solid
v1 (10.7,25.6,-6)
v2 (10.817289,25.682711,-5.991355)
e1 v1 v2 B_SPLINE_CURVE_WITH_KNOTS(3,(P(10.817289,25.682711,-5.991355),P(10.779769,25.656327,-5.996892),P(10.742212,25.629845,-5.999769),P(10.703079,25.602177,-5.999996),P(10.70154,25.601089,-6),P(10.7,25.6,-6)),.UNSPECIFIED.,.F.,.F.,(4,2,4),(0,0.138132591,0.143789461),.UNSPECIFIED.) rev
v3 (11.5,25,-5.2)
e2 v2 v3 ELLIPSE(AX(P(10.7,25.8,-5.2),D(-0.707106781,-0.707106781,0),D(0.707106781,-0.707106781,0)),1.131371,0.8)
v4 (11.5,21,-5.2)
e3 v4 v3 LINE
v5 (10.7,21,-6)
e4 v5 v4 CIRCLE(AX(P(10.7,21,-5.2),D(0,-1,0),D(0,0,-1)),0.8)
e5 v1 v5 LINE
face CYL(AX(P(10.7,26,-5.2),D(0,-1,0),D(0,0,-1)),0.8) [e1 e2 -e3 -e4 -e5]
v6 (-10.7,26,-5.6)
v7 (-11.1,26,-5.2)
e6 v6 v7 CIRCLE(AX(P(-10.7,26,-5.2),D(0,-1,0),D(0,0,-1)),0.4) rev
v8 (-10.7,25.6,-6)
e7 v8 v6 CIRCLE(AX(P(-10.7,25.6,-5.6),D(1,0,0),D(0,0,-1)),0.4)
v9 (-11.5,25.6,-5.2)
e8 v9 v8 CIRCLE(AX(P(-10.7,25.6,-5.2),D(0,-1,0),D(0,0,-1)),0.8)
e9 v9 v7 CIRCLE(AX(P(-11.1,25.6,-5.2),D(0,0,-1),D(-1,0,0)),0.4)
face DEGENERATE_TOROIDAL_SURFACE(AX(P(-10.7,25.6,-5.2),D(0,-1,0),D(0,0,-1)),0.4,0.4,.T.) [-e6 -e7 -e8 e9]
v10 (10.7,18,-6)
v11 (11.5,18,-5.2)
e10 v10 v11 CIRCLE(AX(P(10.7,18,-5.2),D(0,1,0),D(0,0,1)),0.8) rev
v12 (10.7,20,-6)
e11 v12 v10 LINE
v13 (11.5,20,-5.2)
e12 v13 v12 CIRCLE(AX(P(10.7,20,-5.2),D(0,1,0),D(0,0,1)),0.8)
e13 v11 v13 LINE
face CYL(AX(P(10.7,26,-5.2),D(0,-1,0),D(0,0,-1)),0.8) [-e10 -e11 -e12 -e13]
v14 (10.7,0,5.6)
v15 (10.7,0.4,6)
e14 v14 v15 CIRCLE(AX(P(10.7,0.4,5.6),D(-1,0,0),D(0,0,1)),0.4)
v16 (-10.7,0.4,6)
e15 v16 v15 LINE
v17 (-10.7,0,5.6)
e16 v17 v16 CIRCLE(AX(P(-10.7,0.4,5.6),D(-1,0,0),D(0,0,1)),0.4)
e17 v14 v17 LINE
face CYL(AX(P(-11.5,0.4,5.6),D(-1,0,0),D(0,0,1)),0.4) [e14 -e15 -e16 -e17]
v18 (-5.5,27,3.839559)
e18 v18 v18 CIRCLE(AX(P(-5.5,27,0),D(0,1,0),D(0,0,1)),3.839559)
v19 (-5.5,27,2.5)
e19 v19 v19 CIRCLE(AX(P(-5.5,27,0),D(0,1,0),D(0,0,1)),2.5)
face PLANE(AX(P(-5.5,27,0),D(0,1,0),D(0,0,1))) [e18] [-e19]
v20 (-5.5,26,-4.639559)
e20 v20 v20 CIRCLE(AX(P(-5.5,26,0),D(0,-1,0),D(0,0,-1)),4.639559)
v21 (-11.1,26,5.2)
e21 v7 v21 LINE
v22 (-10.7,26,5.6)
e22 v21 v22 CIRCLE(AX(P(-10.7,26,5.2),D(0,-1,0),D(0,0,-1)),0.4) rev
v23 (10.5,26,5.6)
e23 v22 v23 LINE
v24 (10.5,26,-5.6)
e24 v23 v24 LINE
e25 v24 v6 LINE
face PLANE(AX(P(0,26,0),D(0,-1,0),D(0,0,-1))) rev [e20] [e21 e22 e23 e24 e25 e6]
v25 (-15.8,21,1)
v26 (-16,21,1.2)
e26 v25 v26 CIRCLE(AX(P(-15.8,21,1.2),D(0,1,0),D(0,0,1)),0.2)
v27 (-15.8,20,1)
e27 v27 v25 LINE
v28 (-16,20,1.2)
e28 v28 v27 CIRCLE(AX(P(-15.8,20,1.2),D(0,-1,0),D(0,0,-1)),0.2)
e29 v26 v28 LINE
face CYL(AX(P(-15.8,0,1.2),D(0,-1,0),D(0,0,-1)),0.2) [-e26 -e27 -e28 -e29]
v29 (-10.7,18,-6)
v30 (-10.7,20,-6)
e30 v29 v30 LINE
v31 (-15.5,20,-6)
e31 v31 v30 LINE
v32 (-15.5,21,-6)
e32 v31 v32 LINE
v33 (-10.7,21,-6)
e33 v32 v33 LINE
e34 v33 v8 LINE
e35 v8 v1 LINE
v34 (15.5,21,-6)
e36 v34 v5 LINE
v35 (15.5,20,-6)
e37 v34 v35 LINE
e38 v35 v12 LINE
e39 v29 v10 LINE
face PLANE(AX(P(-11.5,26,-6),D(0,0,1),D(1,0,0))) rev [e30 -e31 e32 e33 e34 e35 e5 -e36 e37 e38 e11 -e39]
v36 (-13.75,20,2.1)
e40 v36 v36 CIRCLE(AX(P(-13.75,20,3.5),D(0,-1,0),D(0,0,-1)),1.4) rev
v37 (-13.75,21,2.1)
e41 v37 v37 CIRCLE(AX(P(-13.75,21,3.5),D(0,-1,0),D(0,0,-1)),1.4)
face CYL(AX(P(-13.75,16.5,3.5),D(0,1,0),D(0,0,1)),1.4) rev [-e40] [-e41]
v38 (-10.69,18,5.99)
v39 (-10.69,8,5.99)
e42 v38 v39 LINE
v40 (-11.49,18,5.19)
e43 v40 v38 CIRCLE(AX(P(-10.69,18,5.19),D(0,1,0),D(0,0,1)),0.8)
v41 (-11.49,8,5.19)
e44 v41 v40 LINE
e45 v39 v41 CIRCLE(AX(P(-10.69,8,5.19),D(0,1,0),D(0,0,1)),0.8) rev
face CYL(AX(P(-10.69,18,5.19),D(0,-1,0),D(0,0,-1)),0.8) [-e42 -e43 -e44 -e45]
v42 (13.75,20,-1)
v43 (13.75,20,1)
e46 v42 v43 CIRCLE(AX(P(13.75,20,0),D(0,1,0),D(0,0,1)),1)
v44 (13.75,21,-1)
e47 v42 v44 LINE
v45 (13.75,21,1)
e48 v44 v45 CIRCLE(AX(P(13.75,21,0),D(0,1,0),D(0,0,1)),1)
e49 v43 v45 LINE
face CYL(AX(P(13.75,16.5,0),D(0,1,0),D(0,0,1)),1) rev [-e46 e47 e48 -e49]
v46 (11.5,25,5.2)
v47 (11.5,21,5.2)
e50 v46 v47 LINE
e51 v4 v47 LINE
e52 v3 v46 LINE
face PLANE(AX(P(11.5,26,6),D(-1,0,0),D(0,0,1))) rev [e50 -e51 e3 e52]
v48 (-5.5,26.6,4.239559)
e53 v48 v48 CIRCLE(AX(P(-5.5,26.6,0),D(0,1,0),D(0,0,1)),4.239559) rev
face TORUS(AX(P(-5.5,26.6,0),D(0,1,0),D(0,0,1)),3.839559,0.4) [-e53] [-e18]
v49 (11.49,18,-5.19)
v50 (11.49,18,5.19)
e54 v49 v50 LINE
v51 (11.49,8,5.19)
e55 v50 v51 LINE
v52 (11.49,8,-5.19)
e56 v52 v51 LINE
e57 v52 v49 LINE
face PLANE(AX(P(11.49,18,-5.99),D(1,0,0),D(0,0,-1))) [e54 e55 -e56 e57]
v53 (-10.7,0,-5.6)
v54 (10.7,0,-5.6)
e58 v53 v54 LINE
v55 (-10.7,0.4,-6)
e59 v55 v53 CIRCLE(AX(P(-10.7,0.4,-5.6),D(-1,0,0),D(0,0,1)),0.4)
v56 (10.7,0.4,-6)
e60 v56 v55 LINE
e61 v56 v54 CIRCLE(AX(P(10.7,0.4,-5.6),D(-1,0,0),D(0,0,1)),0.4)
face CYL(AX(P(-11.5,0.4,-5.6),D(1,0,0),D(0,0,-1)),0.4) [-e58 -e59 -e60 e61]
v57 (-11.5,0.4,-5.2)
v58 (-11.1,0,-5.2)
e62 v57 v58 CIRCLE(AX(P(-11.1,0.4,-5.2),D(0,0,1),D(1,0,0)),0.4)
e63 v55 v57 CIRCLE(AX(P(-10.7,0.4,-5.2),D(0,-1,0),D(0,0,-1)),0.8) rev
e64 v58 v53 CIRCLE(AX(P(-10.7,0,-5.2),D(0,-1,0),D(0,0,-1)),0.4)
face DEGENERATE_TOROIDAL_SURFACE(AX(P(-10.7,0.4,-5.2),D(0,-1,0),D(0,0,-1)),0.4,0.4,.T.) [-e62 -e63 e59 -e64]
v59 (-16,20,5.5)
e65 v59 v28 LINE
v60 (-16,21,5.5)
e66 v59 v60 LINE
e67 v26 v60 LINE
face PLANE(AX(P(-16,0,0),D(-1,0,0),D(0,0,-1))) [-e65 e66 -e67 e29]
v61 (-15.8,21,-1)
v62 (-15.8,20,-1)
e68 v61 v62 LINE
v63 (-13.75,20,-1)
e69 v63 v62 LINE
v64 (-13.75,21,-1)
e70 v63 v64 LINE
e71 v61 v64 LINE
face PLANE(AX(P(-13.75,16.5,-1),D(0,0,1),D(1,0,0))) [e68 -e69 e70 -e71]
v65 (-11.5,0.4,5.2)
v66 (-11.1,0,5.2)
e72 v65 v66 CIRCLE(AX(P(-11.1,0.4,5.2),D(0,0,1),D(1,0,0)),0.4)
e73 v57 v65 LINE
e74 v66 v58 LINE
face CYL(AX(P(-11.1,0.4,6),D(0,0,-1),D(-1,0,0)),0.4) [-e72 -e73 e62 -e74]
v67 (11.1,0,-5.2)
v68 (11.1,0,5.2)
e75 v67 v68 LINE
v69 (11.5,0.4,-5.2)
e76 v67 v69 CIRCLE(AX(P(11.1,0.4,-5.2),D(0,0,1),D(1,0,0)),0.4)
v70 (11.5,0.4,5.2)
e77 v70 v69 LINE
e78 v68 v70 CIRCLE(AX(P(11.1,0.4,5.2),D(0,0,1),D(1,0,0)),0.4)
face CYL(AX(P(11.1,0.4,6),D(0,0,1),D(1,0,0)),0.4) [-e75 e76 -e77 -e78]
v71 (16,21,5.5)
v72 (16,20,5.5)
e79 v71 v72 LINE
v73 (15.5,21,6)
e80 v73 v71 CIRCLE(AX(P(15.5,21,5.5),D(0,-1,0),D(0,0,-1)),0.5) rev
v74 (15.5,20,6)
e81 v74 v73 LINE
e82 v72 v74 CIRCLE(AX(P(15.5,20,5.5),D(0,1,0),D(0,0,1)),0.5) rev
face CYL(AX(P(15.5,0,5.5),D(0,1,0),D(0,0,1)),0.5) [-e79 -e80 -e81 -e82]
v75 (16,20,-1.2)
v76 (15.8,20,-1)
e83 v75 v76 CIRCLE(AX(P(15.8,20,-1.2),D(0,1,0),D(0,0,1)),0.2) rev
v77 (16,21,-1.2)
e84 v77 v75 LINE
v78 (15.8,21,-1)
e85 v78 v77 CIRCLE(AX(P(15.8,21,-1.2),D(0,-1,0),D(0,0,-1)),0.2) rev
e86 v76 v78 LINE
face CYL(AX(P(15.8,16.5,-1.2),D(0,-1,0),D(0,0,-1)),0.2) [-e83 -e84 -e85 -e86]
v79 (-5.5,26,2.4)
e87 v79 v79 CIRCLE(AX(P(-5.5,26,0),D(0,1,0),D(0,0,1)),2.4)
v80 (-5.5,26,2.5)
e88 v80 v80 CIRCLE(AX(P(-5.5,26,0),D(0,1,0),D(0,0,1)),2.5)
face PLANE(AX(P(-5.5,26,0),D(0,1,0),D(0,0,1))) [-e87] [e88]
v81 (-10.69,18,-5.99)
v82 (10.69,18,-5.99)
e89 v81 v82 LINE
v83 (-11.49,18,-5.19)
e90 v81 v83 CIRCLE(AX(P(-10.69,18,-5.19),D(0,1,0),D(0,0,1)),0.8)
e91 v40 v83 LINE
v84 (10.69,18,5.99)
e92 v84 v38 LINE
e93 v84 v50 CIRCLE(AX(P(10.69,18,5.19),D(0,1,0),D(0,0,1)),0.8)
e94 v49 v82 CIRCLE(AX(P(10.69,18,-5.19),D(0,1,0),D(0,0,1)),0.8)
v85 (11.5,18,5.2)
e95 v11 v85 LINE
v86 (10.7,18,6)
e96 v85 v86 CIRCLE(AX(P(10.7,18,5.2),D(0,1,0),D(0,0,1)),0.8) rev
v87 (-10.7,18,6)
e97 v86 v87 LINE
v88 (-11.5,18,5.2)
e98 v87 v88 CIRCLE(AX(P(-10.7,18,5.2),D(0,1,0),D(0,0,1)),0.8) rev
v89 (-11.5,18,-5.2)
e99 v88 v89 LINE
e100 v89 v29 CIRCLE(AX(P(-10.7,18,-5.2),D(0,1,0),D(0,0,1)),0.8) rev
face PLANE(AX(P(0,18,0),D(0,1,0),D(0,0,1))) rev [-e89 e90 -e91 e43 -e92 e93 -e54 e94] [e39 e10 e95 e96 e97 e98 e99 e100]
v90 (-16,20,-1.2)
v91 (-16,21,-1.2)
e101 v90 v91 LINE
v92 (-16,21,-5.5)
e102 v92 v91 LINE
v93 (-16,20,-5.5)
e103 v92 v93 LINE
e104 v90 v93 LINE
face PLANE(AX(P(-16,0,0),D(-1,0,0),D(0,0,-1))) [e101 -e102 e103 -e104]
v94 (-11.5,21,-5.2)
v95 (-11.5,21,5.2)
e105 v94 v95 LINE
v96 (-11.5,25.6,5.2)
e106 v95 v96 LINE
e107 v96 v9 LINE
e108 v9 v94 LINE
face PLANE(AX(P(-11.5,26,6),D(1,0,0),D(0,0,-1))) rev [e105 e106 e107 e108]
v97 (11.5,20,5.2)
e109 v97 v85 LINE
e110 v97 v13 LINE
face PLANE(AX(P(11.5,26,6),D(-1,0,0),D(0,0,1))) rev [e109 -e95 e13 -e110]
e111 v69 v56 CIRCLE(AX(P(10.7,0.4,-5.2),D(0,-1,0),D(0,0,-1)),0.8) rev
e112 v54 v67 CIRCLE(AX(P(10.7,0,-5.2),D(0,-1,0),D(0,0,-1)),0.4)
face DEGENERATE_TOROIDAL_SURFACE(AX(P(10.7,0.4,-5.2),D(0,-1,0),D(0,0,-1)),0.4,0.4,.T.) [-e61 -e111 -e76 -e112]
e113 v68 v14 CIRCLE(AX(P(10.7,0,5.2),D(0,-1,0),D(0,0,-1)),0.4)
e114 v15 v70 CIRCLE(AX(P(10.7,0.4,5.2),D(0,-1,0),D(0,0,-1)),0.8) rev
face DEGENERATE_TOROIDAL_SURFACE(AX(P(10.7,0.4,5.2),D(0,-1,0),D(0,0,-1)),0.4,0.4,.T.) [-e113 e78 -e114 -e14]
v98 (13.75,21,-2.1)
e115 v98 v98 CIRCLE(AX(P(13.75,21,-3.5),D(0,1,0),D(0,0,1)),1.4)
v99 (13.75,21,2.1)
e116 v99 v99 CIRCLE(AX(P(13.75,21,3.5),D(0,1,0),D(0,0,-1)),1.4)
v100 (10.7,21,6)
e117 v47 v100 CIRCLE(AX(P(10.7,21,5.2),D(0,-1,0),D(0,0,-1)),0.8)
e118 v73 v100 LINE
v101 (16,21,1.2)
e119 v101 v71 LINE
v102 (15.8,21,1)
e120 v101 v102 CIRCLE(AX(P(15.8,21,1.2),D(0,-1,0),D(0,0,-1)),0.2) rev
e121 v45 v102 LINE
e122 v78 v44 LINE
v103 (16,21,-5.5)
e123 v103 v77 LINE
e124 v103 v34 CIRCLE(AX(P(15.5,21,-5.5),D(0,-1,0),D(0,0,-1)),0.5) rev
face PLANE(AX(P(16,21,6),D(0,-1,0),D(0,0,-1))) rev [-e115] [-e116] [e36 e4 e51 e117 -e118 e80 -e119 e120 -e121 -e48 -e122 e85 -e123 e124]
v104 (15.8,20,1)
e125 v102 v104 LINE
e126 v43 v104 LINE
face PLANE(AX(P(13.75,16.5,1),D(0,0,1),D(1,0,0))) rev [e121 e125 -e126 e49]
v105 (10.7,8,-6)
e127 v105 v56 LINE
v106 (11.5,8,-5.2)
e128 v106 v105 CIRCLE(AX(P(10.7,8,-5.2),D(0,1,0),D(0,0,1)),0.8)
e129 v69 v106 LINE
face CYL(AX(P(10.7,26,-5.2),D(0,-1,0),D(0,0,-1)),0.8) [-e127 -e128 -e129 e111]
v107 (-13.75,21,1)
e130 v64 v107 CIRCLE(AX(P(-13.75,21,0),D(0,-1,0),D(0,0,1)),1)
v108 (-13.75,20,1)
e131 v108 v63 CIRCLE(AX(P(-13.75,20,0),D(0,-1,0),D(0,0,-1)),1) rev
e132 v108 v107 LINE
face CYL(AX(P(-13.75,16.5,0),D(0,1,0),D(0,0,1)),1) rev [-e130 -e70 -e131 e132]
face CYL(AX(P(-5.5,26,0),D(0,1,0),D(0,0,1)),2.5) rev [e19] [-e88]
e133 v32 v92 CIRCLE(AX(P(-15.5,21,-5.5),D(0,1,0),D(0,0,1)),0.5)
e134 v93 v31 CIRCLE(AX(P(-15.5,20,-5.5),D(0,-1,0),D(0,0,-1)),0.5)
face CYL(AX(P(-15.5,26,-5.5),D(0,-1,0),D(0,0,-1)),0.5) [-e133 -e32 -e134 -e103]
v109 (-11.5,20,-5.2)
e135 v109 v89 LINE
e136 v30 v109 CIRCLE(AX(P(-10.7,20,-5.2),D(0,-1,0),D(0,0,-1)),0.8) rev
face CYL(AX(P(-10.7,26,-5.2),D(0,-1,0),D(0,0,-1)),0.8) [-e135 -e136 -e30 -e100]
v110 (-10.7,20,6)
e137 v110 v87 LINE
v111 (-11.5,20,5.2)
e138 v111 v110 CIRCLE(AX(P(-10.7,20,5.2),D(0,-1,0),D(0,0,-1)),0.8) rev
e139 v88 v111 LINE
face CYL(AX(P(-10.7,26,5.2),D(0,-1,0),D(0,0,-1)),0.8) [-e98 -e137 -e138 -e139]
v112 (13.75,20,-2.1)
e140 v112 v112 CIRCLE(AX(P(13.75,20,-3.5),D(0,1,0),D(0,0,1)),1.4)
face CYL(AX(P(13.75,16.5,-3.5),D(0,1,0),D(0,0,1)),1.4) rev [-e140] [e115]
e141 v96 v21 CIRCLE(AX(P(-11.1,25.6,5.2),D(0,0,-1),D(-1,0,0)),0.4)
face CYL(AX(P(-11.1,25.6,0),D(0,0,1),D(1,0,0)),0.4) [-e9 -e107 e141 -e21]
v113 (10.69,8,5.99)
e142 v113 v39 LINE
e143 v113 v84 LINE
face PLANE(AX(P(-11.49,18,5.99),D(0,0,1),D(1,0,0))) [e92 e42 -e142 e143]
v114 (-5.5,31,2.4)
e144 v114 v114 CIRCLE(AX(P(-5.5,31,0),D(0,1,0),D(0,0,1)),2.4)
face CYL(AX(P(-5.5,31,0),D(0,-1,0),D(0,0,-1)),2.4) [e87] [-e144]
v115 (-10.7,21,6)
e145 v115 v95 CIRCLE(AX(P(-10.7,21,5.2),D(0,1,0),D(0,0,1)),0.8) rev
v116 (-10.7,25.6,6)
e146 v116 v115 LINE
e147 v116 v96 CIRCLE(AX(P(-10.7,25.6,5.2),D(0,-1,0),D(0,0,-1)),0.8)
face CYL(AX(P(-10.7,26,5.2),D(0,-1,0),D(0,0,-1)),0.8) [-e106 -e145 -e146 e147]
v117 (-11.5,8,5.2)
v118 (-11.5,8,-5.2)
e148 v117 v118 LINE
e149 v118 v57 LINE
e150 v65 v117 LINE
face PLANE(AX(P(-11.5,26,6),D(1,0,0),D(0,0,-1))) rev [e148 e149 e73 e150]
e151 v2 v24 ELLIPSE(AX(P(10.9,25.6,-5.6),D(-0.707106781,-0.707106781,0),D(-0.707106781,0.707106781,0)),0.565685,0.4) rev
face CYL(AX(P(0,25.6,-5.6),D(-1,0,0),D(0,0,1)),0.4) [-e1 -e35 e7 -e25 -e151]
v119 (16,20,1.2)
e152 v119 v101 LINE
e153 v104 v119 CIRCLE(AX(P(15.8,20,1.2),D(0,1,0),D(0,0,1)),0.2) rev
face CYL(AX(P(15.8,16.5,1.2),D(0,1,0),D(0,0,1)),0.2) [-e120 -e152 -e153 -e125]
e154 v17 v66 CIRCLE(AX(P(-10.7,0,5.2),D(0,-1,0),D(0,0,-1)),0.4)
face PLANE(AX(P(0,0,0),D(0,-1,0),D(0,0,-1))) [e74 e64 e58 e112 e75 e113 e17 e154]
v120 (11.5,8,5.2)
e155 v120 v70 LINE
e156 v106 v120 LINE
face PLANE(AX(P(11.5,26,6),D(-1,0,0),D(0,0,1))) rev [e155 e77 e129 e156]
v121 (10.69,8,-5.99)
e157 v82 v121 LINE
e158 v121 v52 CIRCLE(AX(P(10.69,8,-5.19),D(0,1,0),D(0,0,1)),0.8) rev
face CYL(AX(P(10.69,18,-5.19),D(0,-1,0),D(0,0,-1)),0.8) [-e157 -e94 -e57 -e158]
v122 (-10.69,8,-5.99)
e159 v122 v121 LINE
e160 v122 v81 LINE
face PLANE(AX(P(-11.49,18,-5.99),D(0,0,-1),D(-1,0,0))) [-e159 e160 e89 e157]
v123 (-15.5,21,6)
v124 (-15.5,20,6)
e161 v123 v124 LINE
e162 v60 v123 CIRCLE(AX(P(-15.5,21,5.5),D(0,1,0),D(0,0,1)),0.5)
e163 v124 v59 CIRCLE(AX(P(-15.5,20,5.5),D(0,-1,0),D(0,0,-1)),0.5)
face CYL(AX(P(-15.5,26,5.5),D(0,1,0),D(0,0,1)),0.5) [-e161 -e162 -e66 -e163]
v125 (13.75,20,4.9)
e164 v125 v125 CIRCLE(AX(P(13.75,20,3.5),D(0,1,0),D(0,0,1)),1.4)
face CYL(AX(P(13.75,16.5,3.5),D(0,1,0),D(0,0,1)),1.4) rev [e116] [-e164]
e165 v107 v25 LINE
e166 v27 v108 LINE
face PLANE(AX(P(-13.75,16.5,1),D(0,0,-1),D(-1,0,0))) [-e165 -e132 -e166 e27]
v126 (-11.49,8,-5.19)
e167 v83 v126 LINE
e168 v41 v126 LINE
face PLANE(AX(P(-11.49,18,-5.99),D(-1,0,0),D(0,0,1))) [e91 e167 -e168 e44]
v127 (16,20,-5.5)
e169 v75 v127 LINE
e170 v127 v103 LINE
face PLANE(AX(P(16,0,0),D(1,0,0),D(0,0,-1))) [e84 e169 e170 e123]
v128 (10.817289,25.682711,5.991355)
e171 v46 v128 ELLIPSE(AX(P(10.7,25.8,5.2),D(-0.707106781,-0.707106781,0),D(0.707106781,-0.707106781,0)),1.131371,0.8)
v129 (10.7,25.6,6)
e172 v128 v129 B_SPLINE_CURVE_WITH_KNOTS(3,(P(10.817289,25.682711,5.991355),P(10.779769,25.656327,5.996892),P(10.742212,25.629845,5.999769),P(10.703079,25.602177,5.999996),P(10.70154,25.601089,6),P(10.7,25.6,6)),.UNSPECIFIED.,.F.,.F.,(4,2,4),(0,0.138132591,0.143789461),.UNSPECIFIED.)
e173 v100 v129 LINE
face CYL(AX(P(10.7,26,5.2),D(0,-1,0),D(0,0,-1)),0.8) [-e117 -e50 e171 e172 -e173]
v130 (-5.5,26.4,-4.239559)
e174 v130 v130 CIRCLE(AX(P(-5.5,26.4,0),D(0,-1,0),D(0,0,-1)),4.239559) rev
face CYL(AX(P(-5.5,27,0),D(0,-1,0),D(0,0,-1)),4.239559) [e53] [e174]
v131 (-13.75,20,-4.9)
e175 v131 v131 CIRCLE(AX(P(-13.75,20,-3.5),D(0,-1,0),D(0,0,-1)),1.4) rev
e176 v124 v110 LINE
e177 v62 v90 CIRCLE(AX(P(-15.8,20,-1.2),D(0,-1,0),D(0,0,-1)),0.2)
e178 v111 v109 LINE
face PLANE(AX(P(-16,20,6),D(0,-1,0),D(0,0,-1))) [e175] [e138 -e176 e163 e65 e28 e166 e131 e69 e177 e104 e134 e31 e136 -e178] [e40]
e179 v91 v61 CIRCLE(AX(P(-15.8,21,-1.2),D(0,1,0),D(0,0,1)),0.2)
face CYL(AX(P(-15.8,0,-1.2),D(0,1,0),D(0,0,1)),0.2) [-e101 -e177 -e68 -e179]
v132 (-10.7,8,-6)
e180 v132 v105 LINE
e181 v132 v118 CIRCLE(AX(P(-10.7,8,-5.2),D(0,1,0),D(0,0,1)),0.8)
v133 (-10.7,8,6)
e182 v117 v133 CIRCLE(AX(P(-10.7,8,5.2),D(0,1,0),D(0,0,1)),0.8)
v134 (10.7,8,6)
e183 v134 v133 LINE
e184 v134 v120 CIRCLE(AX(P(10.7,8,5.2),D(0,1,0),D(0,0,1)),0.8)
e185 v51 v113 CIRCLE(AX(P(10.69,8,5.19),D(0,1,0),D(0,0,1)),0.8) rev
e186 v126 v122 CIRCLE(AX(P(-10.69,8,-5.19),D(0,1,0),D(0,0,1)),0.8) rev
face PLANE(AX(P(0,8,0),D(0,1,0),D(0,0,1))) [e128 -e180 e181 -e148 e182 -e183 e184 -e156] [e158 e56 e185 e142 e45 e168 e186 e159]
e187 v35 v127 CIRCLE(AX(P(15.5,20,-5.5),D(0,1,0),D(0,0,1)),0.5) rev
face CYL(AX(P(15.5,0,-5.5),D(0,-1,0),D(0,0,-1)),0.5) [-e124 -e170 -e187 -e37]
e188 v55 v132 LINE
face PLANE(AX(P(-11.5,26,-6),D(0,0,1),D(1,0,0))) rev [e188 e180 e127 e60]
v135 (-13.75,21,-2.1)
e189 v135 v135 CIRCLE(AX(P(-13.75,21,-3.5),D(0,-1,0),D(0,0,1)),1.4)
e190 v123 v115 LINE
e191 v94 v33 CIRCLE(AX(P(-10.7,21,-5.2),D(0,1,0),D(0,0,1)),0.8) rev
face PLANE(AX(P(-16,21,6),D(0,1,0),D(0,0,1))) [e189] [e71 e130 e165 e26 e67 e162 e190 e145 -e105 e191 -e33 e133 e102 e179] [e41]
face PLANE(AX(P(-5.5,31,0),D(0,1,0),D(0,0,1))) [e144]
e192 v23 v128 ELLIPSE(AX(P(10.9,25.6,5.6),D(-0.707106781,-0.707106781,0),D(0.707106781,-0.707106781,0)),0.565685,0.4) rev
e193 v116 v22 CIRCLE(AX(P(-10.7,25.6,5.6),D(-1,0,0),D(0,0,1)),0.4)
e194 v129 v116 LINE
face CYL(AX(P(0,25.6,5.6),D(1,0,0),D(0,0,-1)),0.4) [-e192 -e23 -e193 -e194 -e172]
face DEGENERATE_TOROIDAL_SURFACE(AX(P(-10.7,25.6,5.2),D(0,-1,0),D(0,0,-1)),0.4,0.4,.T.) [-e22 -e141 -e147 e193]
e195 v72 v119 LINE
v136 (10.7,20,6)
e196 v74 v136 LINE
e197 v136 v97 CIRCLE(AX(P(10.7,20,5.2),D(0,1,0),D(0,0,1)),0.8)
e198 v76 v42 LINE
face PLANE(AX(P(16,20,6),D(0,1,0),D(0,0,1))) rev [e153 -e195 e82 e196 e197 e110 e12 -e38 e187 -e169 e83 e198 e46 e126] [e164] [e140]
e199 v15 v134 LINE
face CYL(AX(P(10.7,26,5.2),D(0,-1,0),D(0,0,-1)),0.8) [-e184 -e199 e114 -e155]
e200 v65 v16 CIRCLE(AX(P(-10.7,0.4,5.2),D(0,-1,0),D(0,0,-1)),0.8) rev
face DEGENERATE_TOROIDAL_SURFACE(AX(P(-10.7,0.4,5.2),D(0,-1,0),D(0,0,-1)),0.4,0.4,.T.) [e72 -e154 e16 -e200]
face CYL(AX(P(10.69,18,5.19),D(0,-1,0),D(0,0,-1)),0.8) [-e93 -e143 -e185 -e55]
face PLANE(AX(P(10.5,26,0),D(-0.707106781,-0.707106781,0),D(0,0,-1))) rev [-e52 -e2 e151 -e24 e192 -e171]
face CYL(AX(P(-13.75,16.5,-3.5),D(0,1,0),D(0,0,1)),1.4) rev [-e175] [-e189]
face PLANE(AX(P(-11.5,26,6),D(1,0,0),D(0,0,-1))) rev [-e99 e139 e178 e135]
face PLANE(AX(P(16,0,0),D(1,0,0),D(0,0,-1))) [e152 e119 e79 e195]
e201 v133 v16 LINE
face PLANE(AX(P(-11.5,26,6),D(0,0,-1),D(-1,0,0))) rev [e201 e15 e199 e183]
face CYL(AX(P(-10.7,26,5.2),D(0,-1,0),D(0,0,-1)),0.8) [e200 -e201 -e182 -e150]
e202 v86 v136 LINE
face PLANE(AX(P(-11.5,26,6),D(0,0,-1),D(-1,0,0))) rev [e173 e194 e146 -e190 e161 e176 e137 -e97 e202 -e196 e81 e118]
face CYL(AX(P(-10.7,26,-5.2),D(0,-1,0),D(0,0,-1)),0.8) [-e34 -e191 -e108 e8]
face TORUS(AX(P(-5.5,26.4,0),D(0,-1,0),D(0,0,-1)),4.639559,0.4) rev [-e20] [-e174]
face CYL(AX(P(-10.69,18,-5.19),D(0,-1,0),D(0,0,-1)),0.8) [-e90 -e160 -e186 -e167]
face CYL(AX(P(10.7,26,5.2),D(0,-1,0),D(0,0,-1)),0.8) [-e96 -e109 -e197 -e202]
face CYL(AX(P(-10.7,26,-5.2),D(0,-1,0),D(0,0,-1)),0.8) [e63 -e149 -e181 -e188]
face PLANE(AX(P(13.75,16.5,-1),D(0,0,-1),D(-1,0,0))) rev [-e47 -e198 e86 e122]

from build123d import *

# Parameters (mm, degrees)
ESBO_O1_W                = 23
ESBO_O1_H                = 12
RESSALTO_EXTRUS_O1_DEPTH = 26
ESBO_O8_W                = 23
ESBO_O8_H                = 12
ESBO_O8_W_2              = 22.98
ESBO_O8_H_2              = 11.98
CORTE_EXTRUS_O3_DEPTH    = 10
ESBO_O2_R                = 4.239559465
RESSALTO_EXTRUS_O2_DEPTH = 1
ESBO_O3_R                = 2.5
CORTE_EXTRUS_O1_DEPTH    = 1
ESBO_O4_R                = 2.4
RESSALTO_EXTRUS_O3_DEPTH = 5
ESBO_O5_W                = 12
ESBO_O5_H                = 1
RESSALTO_EXTRUS_O4_DEPTH = 4.5
ESBO_O6_R                = 1.4
CORTE_EXTRUS_O2_DEPTH    = 4.5
FILETE1_R                = 0.5
FILETE2_R                = 0.2
FILETE1_OF_ESPELHAR1_R   = 0.5
FILETE2_OF_ESPELHAR1_R   = 0.2
FILETE3_R                = 0.8
CHANFRO1_SIZE            = 1
FILETE4_R                = 0.4
FILETE5_R                = 0.4
FILETE6_R                = 0.4


with BuildPart() as part:
    # Esboço1 → Ressalto-extrusão1 (new body)
    with BuildSketch(Plane(origin=(0, 0, 0), x_dir=(1, 0, 0), z_dir=(0, 1, 0))):
        Rectangle(ESBO_O1_W, ESBO_O1_H)
    extrude(amount=RESSALTO_EXTRUS_O1_DEPTH)

    # Esboço8 → Corte-extrusão3 (cut)
    with BuildSketch(Plane(origin=(0, 8, 0), x_dir=(-1, 0, 0), z_dir=(0, -1, 0))):
        Rectangle(ESBO_O8_W, ESBO_O8_H)
        Rectangle(ESBO_O8_W_2, ESBO_O8_H_2, mode=Mode.SUBTRACT)
    extrude(amount=-CORTE_EXTRUS_O3_DEPTH, mode=Mode.SUBTRACT)

    # Esboço2 → Ressalto-extrusão2 (add)
    with BuildSketch(Plane(origin=(0, 26, 0), x_dir=(1, 0, 0), z_dir=(0, 1, 0))):
        with Locations(Location((-5.5, 0, 0), (0, 0, 90))):
            Circle(ESBO_O2_R)
    extrude(amount=RESSALTO_EXTRUS_O2_DEPTH)

    # Esboço3 → Corte-extrusão1 (cut)
    with BuildSketch(Plane(origin=(0, 27, 0), x_dir=(1, 0, 0), z_dir=(0, 1, 0))):
        with Locations(Location((-5.5, 0, 0), (0, 0, 270))):
            Circle(ESBO_O3_R)
    extrude(amount=-CORTE_EXTRUS_O1_DEPTH, mode=Mode.SUBTRACT)

    # Esboço4 → Ressalto-extrusão3 (add)
    with BuildSketch(Plane(origin=(0, 26, 0), x_dir=(1, 0, 0), z_dir=(0, 1, 0))):
        with Locations(Location((-5.5, 0, 0), (0, 0, 270))):
            Circle(ESBO_O4_R)
    extrude(amount=RESSALTO_EXTRUS_O3_DEPTH)

    # Esboço5 → Ressalto-extrusão4 (add)
    with BuildSketch(Plane(origin=(11.5, 0, 0), x_dir=(0, 0, -1), z_dir=(1, 0, 0))):
        with Locations((0, 20.5)):
            Rectangle(ESBO_O5_W, ESBO_O5_H)
    ressalto_extrus_o4 = extrude(amount=RESSALTO_EXTRUS_O4_DEPTH)

    # Esboço6 → Corte-extrusão2 (cut)
    with BuildSketch(Plane(origin=(0, 21, 0), x_dir=(1, 0, 0), z_dir=(0, 1, 0))):
        with Locations(Location((13.75, 3.5, 0), (0, 0, 270))):
            Circle(ESBO_O6_R)
        with Locations(Location((13.75, -3.5, 0), (0, 0, 270))):
            Circle(ESBO_O6_R)
        with BuildLine():
            Line((13.75, 1), (16, 1))
            Line((16, 1), (16, -1))
            Line((16, -1), (13.75, -1))
            ThreePointArc((13.75, -1), (12.75, 0), (13.75, 1))
        make_face()
    corte_extrus_o2 = extrude(amount=-CORTE_EXTRUS_O2_DEPTH, mode=Mode.SUBTRACT)

    # Filete1
    filete1_edges = [part.edges().sort_by_distance(p)[0] for p in [
        (16, 20.5, -6),
        (16, 20.5, 6),
    ]]
    fillet(filete1_edges, radius=FILETE1_R)

    # Filete2
    filete2_edges = [part.edges().sort_by_distance(p)[0] for p in [
        (16, 20.5, 1),
        (16, 20.5, -1),
    ]]
    fillet(filete2_edges, radius=FILETE2_R)

    # Espelhar1: Ressalto-extrusão4, Corte-extrusão2 across plane
    add(ressalto_extrus_o4.mirror(Plane(origin=(0, 0, 0), x_dir=(0, 0, 1), z_dir=(1, 0, 0))))
    add(corte_extrus_o2.mirror(Plane(origin=(0, 0, 0), x_dir=(0, 0, 1), z_dir=(1, 0, 0))), mode=Mode.SUBTRACT)

    # Filete1 of Espelhar1
    filete1_of_espelhar1_edges = [part.edges().sort_by_distance(p)[0] for p in [
        (-16, 20.5, -6),
        (-16, 20.5, 6),
    ]]
    fillet(filete1_of_espelhar1_edges, radius=FILETE1_OF_ESPELHAR1_R)

    # Filete2 of Espelhar1
    filete2_of_espelhar1_edges = [part.edges().sort_by_distance(p)[0] for p in [
        (-16, 20.5, 1),
        (-16, 20.5, -1),
    ]]
    fillet(filete2_of_espelhar1_edges, radius=FILETE2_OF_ESPELHAR1_R)

    # Filete3
    filete3_edges = [part.edges().sort_by_distance(p)[0] for p in [
        (-11.5, 23.5, -6),
        (-11.5, 4, -6),
        (-11.5, 19, -6),
        (11.5, 4, -6),
        (11.5, 19, -6),
        (11.5, 23.5, -6),
        (-11.5, 4, 6),
        (-11.5, 19, 6),
        (-11.5, 23.5, 6),
        (11.5, 23.5, 6),
        (11.5, 4, 6),
        (11.5, 19, 6),
        (-11.49, 13, 5.99),
        (-11.49, 13, -5.99),
        (11.49, 13, -5.99),
        (11.49, 13, 5.99),
    ]]
    fillet(filete3_edges, radius=FILETE3_R)

    # Chanfro1
    # the kernel refuses this chamfer: 1 mm, written as the material it takes off along each edge
    with BuildSketch(Plane(origin=(11.5, 26, 7.771682988), x_dir=(-0.9996219169112968, 0.027495876610585647, 0), z_dir=(0, 0, -1))) as chanfro1_piece_1:
        Polygon((CHANFRO1_SIZE * 0.999621916911, -CHANFRO1_SIZE * 0.0274958766106), (-CHANFRO1_SIZE * 0.0274958766106, -CHANFRO1_SIZE * 0.999621916911), (0, 0), align=None)
    extrude(amount=15.543365976, mode=Mode.SUBTRACT)

    # Filete4
    # the kernel refuses this fillet: 0.4 mm, written as the material it takes off along each edge
    with BuildSketch(Plane(origin=(11.5, 26, -6), x_dir=(0, -1, 0), z_dir=(-1, 0, 0)), Plane(origin=(-10.7, 26, 6), x_dir=(0, -1, 0), z_dir=(1, 0, 0))) as filete4_piece_1:
        with BuildLine():
            CenterArc((FILETE4_R, FILETE4_R), FILETE4_R, 180, 90)
            Line((0, FILETE4_R), (0, 0))
            Line((0, 0), (FILETE4_R, 0))
        make_face()
    extrude(amount=22.2, mode=Mode.SUBTRACT)
    with BuildSketch(Plane(origin=(-10.7, 26, -5.2), x_dir=(0, 0, -1), z_dir=(1, 0, 0))) as filete4_piece_2:
        with BuildLine():
            CenterArc((0.8 - FILETE4_R, -FILETE4_R), FILETE4_R, 0, 90)
            Line((0.8 - FILETE4_R, 0), (0.8, 0))
            Line((0.8, 0), (0.8, -FILETE4_R))
        make_face()
    revolve(axis=Axis((-10.7, 26, -5.2), (0, 1, 0)), revolution_arc=90, mode=Mode.SUBTRACT)
    with BuildSketch(Plane(origin=(-11.5, 26, -5.2), x_dir=(1, 0, 0), z_dir=(0, 0, 1)), Plane(origin=(-11.5, 0, -5.2), x_dir=(0, 1, 0), z_dir=(0, 0, 1)), Plane(origin=(11.5, 0, 5.2), x_dir=(0, 1, 0), z_dir=(0, 0, -1))) as filete4_piece_3:
        with BuildLine():
            CenterArc((FILETE4_R, -FILETE4_R), FILETE4_R, 90, 90)
            Line((0, -FILETE4_R), (0, 0))
            Line((0, 0), (FILETE4_R, 0))
        make_face()
    extrude(amount=10.4, mode=Mode.SUBTRACT)
    with BuildSketch(Plane(origin=(-10.7, 26, 5.2), x_dir=(0, 0, 1), z_dir=(1, 0, 0))) as filete4_piece_4:
        with BuildLine():
            CenterArc((0.8 - FILETE4_R, FILETE4_R), FILETE4_R, 270, 90)
            Line((0.8, FILETE4_R), (0.8, 0))
            Line((0.8, 0), (0.8 - FILETE4_R, 0))
        make_face()
    revolve(axis=Axis((-10.7, 26, 5.2), (0, -1, 0)), revolution_arc=90, mode=Mode.SUBTRACT)
    with BuildSketch(Plane(origin=(10.7, 0, -6), x_dir=(0, 1, 0), z_dir=(-1, 0, 0)), Plane(origin=(-10.7, 0, 6), x_dir=(0, 1, 0), z_dir=(1, 0, 0))) as filete4_piece_5:
        with BuildLine():
            CenterArc((FILETE4_R, -FILETE4_R), FILETE4_R, 90, 90)
            Line((0, -FILETE4_R), (0, 0))
            Line((0, 0), (FILETE4_R, 0))
        make_face()
    extrude(amount=21.4, mode=Mode.SUBTRACT)
    with BuildSketch(Plane(origin=(-10.7, 0, 5.2), x_dir=(0, 0, 1), z_dir=(1, 0, 0))) as filete4_piece_6:
        with BuildLine():
            CenterArc((0.8 - FILETE4_R, -FILETE4_R), FILETE4_R, 0, 90)
            Line((0.8 - FILETE4_R, 0), (0.8, 0))
            Line((0.8, 0), (0.8, -FILETE4_R))
        make_face()
    revolve(axis=Axis((-10.7, 0, 5.2), (0, -1, 0)), revolution_arc=90, mode=Mode.SUBTRACT)
    with BuildSketch(Plane(origin=(-10.7, 0, -5.2), x_dir=(0, 0, -1), z_dir=(1, 0, 0))) as filete4_piece_7:
        with BuildLine():
            CenterArc((0.8 - FILETE4_R, FILETE4_R), FILETE4_R, 270, 90)
            Line((0.8 - FILETE4_R, 0), (0.8, 0))
            Line((0.8, 0), (0.8, FILETE4_R))
        make_face()
    revolve(axis=Axis((-10.7, 0, -5.2), (0, 1, 0)), revolution_arc=90, mode=Mode.SUBTRACT)
    with BuildSketch(Plane(origin=(10.7, 0, -5.2), x_dir=(0, 0, -1), z_dir=(-1, 0, 0))) as filete4_piece_8:
        with BuildLine():
            CenterArc((0.8 - FILETE4_R, -FILETE4_R), FILETE4_R, 0, 90)
            Line((0.8 - FILETE4_R, 0), (0.8, 0))
            Line((0.8, 0), (0.8, -FILETE4_R))
        make_face()
    revolve(axis=Axis((10.7, 0, -5.2), (0, -1, 0)), revolution_arc=90, mode=Mode.SUBTRACT)
    with BuildSketch(Plane(origin=(10.7, 0, 5.2), x_dir=(1, 0, 0), z_dir=(0, 0, -1))) as filete4_piece_9:
        with BuildLine():
            CenterArc((0.8 - FILETE4_R, -FILETE4_R), FILETE4_R, 0, 90)
            Line((0.8 - FILETE4_R, 0), (0.8, 0))
            Line((0.8, 0), (0.8, -FILETE4_R))
        make_face()
    revolve(axis=Axis((10.7, 0, 5.2), (0, -1, 0)), revolution_arc=90, mode=Mode.SUBTRACT)

    # Filete5
    filete5_edges = [part.edges().sort_by_distance(p)[0] for p in [
        (-5.5, 27, 4.239559465),
    ]]
    fillet(filete5_edges, radius=FILETE5_R)

    # Filete6
    filete6_edges = [part.edges().sort_by_distance(p)[0] for p in [
        (-5.5, 26, 4.239559465),
    ]]
    fillet(filete6_edges, radius=FILETE6_R)


solid = part.part
